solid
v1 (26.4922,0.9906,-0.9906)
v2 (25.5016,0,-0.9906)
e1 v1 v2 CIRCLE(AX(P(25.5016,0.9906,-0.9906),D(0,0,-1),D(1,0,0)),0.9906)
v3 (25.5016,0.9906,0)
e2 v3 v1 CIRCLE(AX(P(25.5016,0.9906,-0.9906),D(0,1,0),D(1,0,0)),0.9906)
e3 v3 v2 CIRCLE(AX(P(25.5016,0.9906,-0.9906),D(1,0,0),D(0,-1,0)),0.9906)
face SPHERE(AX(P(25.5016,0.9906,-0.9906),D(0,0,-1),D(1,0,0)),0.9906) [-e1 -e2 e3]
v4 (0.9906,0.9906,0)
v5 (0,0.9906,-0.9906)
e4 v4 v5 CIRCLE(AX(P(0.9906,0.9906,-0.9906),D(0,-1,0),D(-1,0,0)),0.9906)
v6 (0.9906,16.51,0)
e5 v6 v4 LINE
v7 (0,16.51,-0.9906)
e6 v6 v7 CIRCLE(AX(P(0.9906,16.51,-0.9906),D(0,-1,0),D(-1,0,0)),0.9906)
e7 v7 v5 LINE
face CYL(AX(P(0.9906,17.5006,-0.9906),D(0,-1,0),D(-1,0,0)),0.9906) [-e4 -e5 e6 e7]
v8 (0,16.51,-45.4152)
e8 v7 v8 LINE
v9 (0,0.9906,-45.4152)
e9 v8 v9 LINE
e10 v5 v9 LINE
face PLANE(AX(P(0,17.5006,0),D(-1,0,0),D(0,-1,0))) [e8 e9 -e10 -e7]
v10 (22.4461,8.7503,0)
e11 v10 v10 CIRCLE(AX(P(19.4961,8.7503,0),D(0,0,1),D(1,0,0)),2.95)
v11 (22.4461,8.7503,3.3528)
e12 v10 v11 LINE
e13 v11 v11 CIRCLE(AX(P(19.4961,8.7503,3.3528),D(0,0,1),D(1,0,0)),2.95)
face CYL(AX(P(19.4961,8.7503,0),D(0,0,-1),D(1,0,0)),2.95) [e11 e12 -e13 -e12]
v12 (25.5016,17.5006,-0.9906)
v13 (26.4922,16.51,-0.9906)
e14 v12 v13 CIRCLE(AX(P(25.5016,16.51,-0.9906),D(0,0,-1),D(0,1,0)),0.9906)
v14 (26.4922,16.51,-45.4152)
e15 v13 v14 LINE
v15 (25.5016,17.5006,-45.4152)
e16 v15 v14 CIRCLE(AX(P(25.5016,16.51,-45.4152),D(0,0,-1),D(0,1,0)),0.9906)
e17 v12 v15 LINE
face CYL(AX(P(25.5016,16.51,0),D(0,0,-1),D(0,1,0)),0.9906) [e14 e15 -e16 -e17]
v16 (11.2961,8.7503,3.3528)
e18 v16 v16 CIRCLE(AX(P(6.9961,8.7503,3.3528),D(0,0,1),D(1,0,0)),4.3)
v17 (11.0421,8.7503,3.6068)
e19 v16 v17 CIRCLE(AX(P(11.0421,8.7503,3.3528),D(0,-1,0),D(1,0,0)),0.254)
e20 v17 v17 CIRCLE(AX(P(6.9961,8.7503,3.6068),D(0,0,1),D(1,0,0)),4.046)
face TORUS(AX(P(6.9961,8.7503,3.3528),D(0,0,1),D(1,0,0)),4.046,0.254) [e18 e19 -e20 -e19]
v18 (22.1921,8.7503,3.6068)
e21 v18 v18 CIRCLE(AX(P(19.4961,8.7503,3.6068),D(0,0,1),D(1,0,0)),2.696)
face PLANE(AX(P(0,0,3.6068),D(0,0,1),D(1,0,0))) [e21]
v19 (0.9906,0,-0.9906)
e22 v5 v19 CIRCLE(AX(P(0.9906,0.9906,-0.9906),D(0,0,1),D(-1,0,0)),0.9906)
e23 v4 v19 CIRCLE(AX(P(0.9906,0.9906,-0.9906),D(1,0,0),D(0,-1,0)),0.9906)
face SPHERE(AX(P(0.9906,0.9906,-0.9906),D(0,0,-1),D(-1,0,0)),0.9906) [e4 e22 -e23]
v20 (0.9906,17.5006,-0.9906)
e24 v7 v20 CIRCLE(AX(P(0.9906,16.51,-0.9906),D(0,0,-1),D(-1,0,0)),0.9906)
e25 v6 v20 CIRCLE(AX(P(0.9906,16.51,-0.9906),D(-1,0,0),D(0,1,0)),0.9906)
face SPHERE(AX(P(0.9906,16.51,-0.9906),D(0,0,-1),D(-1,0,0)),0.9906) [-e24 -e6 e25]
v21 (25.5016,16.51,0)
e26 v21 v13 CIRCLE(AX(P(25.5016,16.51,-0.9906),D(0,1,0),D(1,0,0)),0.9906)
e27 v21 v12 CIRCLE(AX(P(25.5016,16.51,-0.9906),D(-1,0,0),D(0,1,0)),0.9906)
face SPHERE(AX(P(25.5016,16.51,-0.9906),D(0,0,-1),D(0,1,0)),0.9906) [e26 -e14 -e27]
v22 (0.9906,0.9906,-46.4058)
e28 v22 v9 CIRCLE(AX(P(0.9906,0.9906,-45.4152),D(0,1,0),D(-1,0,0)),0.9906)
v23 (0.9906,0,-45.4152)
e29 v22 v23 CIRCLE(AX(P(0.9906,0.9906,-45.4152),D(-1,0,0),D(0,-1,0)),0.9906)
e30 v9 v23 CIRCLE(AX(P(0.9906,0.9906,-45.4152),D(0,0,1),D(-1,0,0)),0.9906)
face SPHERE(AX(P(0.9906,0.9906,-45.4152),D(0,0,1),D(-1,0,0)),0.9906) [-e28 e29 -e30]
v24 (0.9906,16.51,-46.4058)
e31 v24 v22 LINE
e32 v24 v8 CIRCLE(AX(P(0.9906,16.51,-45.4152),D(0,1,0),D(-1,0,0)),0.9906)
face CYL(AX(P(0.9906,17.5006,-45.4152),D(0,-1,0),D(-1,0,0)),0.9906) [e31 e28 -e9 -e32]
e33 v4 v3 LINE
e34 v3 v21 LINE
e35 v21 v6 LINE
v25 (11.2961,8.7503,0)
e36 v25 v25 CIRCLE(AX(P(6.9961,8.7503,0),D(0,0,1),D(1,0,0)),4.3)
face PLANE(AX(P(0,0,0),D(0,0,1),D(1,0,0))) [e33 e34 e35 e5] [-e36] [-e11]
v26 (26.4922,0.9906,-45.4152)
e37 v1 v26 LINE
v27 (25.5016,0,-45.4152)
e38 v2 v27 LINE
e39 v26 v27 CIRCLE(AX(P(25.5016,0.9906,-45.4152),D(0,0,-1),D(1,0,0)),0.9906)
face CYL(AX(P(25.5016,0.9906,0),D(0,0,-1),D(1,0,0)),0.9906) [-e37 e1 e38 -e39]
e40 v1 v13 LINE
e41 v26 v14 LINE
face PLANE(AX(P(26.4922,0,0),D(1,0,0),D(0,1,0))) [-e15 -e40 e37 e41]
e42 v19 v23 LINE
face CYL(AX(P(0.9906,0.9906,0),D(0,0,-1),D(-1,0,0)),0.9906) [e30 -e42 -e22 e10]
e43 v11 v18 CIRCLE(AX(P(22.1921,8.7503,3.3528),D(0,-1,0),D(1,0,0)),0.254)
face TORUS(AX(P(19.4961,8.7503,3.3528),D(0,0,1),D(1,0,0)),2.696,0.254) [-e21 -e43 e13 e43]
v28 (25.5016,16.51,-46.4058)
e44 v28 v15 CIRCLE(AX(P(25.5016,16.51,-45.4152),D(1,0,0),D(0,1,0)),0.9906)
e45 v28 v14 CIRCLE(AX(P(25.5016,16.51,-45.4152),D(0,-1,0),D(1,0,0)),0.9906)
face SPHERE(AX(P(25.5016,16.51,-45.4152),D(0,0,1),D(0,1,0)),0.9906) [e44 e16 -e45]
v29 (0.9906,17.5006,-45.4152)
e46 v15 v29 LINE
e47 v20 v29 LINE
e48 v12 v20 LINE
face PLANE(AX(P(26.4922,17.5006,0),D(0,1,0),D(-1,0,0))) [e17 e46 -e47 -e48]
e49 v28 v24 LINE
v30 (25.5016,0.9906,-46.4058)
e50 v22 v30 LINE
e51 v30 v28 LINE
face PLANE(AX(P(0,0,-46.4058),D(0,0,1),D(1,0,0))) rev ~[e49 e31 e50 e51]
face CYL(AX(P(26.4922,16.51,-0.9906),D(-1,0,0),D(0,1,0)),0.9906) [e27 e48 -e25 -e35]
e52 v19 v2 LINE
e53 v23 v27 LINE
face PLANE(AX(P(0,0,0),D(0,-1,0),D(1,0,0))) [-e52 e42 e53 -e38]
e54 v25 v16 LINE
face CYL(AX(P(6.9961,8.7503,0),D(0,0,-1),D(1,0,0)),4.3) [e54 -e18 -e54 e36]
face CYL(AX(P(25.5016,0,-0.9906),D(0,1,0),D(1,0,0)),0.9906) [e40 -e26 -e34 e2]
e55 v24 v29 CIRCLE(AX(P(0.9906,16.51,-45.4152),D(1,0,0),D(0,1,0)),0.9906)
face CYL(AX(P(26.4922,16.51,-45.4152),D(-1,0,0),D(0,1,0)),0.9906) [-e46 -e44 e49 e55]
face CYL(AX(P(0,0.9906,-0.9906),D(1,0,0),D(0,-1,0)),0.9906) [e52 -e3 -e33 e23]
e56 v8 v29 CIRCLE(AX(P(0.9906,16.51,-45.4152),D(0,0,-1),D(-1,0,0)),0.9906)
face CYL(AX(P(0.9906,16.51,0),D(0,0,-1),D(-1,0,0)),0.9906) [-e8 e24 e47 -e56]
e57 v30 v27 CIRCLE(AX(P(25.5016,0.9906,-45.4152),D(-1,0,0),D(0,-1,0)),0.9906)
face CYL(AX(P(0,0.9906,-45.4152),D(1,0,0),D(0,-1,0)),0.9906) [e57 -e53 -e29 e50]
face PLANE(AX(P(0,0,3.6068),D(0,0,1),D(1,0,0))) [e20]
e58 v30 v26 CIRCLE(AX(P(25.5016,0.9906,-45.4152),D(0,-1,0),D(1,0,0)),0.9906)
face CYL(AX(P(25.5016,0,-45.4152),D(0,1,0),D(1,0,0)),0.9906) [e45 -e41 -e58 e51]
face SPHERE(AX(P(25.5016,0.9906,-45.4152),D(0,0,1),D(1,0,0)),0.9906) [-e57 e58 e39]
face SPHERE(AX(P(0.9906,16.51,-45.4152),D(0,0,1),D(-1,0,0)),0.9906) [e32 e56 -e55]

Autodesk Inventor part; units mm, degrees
ref_plane "YZ Plane" through (0, 0, 0) normal (1, 0, 0) x (0, 1, 0)
ref_plane "XZ Plane" through (0, 0, 0) normal (0, 1, 0) x (-1, 0, 0)
sketch "Sketch1" plane through (0, 0, 0) normal (0, 0, 1) x (1, 0, 0)
  line L0 (0, 0) -> (26.4922, 0)
  line L1 (26.4922, 0) -> (26.4922, 17.5006)
  line L2 (26.4922, 17.5006) -> (0, 17.5006)
  line L3 (0, 17.5006) -> (0, 0)
  dimension "d0" = 26.4922
  dimension "d1" = 17.5006
extrude "Extrusion1" add sketch "Sketch1" against normal blind 46.4058
fillet "Fillet1" radius 0.9906 12 edges at (0, 17.5006, -23.2029) (0, 0, -23.2029) (0, 8.7503, 0) (0, 8.7503, -46.4058) (26.4922, 17.5006, -23.2029) (13.2461, 17.5006, 0) (13.2461, 17.5006, -46.4058) (26.4922, 0, -23.2029) (26.4922, 8.7503, 0) (26.4922, 8.7503, -46.4058) (13.2461, 0, 0) (13.2461, 0, -46.4058)
sketch "Sketch2" plane through (0, 0, 0) normal (0, 0, 1) x (1, 0, 0)
  line L0 (0.9906, 16.51) -> (25.5016, 16.51) projected
  line L1 (0.9906, 0.9906) -> (0.9906, 16.51) projected
  line L2 (0.9961, 16.5003) -> (25.4961, 16.5003)
  line L3 (0.9961, 16.5003) -> (0.9961, 1.0003)
  line L4 (0.9961, 1.0003) -> (25.4961, 1.0003)
  line L5 (25.4961, 1.0003) -> (25.4961, 16.5003)
  circle A0 centre (6.9961, 8.7503) radius 4.3
  circle A1 centre (19.4961, 8.7503) radius 2.95
  point P0 (0, 0)
  point P1 (13.2461, 8.7503)
  point P2 (13.2461, 8.7503)
  point P3 (13.2461, 16.51)
  point P4 (0.9906, 8.7503)
extrude "Extrusion2" add sketch "Sketch2" along normal blind 3.6068 contours A0 | A1
fillet "Fillet2" radius 0.254 2 edges at (2.6961, 8.7503, 3.6068) (16.5461, 8.7503, 3.6068)
ref_plane "Work Plane1" through (13.2461, 0.9906, -45.4152) normal (1, 0, 0) x (0, 0, -1)
properties part number "276-2243" material "ABS Plastic"
